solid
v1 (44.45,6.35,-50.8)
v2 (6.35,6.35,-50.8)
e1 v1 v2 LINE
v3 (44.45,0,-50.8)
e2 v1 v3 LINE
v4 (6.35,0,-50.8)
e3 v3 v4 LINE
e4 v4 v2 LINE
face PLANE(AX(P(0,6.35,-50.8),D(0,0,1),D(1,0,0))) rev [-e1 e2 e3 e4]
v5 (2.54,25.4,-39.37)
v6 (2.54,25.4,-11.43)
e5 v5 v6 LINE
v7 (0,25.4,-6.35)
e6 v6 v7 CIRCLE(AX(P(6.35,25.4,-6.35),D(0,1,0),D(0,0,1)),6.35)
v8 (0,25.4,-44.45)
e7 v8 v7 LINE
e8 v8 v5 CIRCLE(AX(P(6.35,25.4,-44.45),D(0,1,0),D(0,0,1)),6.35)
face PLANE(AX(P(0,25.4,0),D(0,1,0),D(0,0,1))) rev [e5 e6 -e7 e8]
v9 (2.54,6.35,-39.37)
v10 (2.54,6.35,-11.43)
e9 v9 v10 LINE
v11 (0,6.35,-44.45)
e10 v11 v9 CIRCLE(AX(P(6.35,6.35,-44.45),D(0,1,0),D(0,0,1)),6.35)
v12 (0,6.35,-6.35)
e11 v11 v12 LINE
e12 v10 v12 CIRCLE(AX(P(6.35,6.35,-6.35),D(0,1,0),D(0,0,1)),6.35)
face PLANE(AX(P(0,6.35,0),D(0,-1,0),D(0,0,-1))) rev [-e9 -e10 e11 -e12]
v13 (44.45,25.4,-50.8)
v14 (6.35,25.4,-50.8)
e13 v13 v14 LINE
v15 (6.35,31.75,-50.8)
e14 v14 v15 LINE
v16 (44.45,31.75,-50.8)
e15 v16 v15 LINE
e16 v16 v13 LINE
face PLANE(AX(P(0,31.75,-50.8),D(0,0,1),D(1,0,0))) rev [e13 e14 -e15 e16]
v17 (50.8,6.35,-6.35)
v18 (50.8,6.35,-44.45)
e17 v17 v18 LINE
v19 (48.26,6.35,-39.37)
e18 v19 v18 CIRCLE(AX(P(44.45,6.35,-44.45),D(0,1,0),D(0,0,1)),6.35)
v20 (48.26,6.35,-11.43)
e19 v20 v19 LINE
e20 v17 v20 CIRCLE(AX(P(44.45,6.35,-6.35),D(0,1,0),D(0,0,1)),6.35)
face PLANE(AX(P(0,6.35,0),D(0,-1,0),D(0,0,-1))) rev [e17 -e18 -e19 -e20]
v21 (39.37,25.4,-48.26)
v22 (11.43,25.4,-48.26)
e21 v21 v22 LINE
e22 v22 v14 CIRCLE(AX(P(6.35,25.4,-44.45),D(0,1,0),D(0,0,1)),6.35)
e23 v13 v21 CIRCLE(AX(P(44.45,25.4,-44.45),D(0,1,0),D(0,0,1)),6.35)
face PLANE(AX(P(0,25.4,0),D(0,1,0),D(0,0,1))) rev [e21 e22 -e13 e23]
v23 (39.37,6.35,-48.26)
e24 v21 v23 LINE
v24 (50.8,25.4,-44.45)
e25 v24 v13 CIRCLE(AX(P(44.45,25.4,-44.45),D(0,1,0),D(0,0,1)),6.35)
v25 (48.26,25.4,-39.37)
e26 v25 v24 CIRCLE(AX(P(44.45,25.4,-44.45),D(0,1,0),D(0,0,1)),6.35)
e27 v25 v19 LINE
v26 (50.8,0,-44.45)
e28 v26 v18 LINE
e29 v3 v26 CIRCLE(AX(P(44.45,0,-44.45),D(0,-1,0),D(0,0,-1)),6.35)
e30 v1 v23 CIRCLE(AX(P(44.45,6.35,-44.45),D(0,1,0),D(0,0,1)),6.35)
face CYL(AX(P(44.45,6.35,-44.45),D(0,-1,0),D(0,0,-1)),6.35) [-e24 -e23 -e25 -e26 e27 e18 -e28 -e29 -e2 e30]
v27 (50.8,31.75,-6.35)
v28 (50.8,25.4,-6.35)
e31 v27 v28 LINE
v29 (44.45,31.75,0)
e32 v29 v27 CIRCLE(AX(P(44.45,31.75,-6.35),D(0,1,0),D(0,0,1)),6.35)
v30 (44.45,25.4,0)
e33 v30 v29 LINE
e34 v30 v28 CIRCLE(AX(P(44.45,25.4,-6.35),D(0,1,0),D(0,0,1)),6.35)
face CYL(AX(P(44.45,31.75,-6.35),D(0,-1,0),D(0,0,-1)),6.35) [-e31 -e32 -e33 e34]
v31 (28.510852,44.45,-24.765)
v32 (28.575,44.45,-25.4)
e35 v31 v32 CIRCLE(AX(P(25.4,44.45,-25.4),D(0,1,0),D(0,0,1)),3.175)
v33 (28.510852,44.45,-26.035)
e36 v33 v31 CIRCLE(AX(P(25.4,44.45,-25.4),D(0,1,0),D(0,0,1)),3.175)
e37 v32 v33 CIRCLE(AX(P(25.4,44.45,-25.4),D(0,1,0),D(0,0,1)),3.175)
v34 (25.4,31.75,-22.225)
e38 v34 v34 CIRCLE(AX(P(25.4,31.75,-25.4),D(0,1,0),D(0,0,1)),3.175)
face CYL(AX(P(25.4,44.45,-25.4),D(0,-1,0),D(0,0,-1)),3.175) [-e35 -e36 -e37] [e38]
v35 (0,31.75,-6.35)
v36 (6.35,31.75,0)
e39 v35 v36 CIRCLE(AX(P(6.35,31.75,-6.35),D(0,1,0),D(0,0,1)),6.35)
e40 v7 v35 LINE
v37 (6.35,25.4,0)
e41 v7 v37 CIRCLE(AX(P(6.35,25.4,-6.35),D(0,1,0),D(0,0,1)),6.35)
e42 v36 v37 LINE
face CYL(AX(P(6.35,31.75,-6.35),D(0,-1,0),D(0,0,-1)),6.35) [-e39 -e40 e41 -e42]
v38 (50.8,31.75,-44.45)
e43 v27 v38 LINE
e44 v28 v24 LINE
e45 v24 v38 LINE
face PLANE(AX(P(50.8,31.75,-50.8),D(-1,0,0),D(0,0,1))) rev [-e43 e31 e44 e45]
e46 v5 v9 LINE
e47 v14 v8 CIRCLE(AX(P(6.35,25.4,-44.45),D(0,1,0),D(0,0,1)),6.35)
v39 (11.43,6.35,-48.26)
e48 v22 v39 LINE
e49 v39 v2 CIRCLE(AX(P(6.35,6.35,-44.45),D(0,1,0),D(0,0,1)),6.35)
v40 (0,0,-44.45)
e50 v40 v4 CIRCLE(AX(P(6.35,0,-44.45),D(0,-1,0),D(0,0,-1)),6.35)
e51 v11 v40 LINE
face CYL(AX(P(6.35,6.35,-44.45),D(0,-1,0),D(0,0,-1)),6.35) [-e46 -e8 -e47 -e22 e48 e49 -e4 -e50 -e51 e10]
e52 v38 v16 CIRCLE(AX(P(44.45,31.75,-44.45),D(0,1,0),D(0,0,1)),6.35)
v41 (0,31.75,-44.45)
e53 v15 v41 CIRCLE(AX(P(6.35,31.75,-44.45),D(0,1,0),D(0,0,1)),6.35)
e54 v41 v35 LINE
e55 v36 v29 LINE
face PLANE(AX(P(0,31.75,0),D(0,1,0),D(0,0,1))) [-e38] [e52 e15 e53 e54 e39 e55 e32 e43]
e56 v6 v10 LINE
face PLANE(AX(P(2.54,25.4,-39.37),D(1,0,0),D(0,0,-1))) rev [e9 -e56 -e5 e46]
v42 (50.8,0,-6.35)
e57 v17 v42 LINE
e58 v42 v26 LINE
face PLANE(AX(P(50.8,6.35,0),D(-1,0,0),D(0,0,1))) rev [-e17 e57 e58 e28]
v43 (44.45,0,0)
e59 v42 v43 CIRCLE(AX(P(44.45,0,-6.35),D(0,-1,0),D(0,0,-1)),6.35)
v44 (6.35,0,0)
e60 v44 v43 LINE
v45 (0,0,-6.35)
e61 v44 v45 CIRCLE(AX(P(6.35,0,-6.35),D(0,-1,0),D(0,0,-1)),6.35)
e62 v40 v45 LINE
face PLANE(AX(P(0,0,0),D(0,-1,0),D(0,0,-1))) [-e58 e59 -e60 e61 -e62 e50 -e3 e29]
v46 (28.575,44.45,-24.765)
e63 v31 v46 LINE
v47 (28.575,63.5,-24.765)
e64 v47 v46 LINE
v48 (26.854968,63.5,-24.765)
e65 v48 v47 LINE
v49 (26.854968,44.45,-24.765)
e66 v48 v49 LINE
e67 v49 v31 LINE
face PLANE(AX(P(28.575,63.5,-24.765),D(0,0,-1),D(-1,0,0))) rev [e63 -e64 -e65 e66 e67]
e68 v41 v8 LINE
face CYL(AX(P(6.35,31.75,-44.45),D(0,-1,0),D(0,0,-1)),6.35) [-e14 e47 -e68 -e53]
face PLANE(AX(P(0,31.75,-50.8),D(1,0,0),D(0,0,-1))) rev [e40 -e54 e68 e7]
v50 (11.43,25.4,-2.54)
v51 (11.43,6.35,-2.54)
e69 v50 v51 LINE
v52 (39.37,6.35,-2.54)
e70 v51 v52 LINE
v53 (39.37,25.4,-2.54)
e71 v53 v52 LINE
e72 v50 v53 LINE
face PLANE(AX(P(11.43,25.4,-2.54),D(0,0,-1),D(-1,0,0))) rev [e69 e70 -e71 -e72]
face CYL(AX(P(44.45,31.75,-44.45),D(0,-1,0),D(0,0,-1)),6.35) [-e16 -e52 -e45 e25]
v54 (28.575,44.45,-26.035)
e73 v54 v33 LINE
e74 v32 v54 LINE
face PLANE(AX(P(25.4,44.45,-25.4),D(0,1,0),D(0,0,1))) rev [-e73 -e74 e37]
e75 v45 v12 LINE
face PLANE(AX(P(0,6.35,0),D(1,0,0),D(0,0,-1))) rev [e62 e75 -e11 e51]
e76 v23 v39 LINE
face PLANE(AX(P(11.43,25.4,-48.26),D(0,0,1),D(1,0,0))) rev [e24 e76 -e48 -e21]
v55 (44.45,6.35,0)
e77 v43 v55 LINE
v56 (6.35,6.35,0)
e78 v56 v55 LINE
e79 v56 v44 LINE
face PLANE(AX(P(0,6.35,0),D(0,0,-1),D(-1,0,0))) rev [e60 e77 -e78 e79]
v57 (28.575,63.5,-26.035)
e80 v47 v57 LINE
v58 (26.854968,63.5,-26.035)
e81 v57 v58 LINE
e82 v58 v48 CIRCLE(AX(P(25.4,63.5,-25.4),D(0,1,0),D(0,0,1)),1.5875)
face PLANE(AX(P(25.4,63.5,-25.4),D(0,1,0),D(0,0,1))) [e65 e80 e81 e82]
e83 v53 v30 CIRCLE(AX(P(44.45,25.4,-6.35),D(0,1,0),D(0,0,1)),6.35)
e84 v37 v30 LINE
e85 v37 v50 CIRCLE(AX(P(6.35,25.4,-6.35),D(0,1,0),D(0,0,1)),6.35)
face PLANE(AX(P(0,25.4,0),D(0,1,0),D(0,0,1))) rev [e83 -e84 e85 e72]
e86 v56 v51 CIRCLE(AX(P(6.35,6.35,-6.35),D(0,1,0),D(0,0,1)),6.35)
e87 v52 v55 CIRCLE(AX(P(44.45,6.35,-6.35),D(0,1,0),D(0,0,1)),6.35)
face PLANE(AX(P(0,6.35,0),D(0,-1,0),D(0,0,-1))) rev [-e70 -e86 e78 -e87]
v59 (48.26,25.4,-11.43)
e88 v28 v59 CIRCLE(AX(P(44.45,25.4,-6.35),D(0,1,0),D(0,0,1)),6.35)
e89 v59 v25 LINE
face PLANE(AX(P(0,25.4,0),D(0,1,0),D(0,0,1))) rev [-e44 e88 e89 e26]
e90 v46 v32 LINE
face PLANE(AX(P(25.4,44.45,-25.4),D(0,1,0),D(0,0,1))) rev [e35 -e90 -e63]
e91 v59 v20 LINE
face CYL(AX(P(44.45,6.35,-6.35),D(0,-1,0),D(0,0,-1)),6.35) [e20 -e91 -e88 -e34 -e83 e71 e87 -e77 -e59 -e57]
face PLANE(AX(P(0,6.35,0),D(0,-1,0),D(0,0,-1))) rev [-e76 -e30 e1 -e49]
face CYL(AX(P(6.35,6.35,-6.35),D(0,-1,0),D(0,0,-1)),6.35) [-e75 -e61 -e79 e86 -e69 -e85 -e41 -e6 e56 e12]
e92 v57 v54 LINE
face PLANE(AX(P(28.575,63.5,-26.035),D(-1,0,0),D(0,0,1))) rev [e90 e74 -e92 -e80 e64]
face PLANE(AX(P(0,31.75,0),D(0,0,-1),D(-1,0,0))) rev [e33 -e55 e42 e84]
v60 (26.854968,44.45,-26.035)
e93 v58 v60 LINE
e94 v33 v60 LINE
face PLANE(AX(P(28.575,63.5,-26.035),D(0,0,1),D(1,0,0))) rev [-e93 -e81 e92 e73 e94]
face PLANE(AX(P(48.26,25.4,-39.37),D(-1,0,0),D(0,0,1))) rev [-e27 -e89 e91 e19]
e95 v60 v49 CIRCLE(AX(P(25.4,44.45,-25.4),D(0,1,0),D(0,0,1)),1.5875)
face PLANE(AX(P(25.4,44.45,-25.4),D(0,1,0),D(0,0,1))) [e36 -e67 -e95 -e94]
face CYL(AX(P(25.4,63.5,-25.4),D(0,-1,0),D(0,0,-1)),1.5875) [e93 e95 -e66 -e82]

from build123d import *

# Parameters (mm, degrees)
SKETCH1_W           = 50.8
SKETCH1_H           = 50.8
BOSS_EXTRUDE1_DEPTH = 6.35
FILLET1_R           = 6.35
BOSS_EXTRUDE2_START = 19.05
BOSS_EXTRUDE2_DEPTH = 19.05
SKETCH5_W           = 50.8
SKETCH5_H           = 50.8
BOSS_EXTRUDE3_DEPTH = 6.35
FILLET2_R           = 6.35
SKETCH6_R           = 3.175
BOSS_EXTRUDE4_DEPTH = 12.7
BOSS_EXTRUDE5_DEPTH = 19.05


with BuildPart() as part:
    # Sketch1 → Boss-Extrude1 (new body)
    with BuildSketch(Plane(origin=(0, 0, 0), x_dir=(1, 0, 0), z_dir=(0, 1, 0))):
        with Locations((25.4, 25.4)):
            Rectangle(SKETCH1_W, SKETCH1_H)
    extrude(amount=BOSS_EXTRUDE1_DEPTH)

    # Fillet1
    fillet1_edges = [part.edges().sort_by_distance(p)[0] for p in [
        (0, 3.175, -50.8),
        (50.8, 3.175, -50.8),
        (50.8, 3.175, 0),
        (0, 3.175, 0),
    ]]
    fillet(fillet1_edges, radius=FILLET1_R)

    # Sketch3 → Boss-Extrude2 (add)
    with BuildSketch(Plane(origin=(0, 6.35, 0), x_dir=(1, 0, 0), z_dir=(0, 1, 0)).offset(BOSS_EXTRUDE2_START)):
        with BuildLine():
            Line((11.43, 48.26), (39.37, 48.26))
            ThreePointArc((39.37, 48.26), (48.940128061, 48.940128061), (48.26, 39.37))
            Line((48.26, 39.37), (48.26, 11.43))
            ThreePointArc((48.26, 11.43), (48.940128061, 1.859871939), (39.37, 2.54))
            Line((39.37, 2.54), (11.43, 2.54))
            ThreePointArc((11.43, 2.54), (1.859871939, 1.859871939), (2.54, 11.43))
            Line((2.54, 11.43), (2.54, 39.37))
            ThreePointArc((2.54, 39.37), (1.859871939, 48.940128061), (11.43, 48.26))
        make_face()
    extrude(amount=-BOSS_EXTRUDE2_DEPTH)

    # Sketch5 → Boss-Extrude3 (add)
    with BuildSketch(Plane(origin=(0, 25.4, 0), x_dir=(1, 0, 0), z_dir=(0, 1, 0))):
        with Locations((25.4, 25.4)):
            Rectangle(SKETCH5_W, SKETCH5_H)
    extrude(amount=BOSS_EXTRUDE3_DEPTH)

    # Fillet2
    fillet2_edges = [part.edges().sort_by_distance(p)[0] for p in [
        (50.8, 28.575, -50.8),
        (0, 28.575, -50.8),
        (50.8, 28.575, 0),
        (0, 28.575, 0),
    ]]
    fillet(fillet2_edges, radius=FILLET2_R - 0.0001)  # a hair under: the kernel refuses the full size

    # Sketch6 → Boss-Extrude4 (add)
    with BuildSketch(Plane(origin=(0, 31.75, 0), x_dir=(1, 0, 0), z_dir=(0, 1, 0))):
        with Locations(Location((25.4, 25.4, 0), (0, 0, 270))):
            Circle(SKETCH6_R)
    extrude(amount=BOSS_EXTRUDE4_DEPTH)

    # Sketch7 → Boss-Extrude5 (add)
    with BuildSketch(Plane(origin=(0, 44.45, 0), x_dir=(1, 0, 0), z_dir=(0, 1, 0))):
        with BuildLine():
            Line((28.575, 26.035), (28.575, 24.765))
            Line((28.575, 24.765), (26.854967783, 24.765))
            ThreePointArc((26.854967783, 24.765), (23.8125, 25.4), (26.854967783, 26.035))
            Line((26.854967783, 26.035), (28.575, 26.035))
        make_face()
    extrude(amount=BOSS_EXTRUDE5_DEPTH)


solid = part.part
